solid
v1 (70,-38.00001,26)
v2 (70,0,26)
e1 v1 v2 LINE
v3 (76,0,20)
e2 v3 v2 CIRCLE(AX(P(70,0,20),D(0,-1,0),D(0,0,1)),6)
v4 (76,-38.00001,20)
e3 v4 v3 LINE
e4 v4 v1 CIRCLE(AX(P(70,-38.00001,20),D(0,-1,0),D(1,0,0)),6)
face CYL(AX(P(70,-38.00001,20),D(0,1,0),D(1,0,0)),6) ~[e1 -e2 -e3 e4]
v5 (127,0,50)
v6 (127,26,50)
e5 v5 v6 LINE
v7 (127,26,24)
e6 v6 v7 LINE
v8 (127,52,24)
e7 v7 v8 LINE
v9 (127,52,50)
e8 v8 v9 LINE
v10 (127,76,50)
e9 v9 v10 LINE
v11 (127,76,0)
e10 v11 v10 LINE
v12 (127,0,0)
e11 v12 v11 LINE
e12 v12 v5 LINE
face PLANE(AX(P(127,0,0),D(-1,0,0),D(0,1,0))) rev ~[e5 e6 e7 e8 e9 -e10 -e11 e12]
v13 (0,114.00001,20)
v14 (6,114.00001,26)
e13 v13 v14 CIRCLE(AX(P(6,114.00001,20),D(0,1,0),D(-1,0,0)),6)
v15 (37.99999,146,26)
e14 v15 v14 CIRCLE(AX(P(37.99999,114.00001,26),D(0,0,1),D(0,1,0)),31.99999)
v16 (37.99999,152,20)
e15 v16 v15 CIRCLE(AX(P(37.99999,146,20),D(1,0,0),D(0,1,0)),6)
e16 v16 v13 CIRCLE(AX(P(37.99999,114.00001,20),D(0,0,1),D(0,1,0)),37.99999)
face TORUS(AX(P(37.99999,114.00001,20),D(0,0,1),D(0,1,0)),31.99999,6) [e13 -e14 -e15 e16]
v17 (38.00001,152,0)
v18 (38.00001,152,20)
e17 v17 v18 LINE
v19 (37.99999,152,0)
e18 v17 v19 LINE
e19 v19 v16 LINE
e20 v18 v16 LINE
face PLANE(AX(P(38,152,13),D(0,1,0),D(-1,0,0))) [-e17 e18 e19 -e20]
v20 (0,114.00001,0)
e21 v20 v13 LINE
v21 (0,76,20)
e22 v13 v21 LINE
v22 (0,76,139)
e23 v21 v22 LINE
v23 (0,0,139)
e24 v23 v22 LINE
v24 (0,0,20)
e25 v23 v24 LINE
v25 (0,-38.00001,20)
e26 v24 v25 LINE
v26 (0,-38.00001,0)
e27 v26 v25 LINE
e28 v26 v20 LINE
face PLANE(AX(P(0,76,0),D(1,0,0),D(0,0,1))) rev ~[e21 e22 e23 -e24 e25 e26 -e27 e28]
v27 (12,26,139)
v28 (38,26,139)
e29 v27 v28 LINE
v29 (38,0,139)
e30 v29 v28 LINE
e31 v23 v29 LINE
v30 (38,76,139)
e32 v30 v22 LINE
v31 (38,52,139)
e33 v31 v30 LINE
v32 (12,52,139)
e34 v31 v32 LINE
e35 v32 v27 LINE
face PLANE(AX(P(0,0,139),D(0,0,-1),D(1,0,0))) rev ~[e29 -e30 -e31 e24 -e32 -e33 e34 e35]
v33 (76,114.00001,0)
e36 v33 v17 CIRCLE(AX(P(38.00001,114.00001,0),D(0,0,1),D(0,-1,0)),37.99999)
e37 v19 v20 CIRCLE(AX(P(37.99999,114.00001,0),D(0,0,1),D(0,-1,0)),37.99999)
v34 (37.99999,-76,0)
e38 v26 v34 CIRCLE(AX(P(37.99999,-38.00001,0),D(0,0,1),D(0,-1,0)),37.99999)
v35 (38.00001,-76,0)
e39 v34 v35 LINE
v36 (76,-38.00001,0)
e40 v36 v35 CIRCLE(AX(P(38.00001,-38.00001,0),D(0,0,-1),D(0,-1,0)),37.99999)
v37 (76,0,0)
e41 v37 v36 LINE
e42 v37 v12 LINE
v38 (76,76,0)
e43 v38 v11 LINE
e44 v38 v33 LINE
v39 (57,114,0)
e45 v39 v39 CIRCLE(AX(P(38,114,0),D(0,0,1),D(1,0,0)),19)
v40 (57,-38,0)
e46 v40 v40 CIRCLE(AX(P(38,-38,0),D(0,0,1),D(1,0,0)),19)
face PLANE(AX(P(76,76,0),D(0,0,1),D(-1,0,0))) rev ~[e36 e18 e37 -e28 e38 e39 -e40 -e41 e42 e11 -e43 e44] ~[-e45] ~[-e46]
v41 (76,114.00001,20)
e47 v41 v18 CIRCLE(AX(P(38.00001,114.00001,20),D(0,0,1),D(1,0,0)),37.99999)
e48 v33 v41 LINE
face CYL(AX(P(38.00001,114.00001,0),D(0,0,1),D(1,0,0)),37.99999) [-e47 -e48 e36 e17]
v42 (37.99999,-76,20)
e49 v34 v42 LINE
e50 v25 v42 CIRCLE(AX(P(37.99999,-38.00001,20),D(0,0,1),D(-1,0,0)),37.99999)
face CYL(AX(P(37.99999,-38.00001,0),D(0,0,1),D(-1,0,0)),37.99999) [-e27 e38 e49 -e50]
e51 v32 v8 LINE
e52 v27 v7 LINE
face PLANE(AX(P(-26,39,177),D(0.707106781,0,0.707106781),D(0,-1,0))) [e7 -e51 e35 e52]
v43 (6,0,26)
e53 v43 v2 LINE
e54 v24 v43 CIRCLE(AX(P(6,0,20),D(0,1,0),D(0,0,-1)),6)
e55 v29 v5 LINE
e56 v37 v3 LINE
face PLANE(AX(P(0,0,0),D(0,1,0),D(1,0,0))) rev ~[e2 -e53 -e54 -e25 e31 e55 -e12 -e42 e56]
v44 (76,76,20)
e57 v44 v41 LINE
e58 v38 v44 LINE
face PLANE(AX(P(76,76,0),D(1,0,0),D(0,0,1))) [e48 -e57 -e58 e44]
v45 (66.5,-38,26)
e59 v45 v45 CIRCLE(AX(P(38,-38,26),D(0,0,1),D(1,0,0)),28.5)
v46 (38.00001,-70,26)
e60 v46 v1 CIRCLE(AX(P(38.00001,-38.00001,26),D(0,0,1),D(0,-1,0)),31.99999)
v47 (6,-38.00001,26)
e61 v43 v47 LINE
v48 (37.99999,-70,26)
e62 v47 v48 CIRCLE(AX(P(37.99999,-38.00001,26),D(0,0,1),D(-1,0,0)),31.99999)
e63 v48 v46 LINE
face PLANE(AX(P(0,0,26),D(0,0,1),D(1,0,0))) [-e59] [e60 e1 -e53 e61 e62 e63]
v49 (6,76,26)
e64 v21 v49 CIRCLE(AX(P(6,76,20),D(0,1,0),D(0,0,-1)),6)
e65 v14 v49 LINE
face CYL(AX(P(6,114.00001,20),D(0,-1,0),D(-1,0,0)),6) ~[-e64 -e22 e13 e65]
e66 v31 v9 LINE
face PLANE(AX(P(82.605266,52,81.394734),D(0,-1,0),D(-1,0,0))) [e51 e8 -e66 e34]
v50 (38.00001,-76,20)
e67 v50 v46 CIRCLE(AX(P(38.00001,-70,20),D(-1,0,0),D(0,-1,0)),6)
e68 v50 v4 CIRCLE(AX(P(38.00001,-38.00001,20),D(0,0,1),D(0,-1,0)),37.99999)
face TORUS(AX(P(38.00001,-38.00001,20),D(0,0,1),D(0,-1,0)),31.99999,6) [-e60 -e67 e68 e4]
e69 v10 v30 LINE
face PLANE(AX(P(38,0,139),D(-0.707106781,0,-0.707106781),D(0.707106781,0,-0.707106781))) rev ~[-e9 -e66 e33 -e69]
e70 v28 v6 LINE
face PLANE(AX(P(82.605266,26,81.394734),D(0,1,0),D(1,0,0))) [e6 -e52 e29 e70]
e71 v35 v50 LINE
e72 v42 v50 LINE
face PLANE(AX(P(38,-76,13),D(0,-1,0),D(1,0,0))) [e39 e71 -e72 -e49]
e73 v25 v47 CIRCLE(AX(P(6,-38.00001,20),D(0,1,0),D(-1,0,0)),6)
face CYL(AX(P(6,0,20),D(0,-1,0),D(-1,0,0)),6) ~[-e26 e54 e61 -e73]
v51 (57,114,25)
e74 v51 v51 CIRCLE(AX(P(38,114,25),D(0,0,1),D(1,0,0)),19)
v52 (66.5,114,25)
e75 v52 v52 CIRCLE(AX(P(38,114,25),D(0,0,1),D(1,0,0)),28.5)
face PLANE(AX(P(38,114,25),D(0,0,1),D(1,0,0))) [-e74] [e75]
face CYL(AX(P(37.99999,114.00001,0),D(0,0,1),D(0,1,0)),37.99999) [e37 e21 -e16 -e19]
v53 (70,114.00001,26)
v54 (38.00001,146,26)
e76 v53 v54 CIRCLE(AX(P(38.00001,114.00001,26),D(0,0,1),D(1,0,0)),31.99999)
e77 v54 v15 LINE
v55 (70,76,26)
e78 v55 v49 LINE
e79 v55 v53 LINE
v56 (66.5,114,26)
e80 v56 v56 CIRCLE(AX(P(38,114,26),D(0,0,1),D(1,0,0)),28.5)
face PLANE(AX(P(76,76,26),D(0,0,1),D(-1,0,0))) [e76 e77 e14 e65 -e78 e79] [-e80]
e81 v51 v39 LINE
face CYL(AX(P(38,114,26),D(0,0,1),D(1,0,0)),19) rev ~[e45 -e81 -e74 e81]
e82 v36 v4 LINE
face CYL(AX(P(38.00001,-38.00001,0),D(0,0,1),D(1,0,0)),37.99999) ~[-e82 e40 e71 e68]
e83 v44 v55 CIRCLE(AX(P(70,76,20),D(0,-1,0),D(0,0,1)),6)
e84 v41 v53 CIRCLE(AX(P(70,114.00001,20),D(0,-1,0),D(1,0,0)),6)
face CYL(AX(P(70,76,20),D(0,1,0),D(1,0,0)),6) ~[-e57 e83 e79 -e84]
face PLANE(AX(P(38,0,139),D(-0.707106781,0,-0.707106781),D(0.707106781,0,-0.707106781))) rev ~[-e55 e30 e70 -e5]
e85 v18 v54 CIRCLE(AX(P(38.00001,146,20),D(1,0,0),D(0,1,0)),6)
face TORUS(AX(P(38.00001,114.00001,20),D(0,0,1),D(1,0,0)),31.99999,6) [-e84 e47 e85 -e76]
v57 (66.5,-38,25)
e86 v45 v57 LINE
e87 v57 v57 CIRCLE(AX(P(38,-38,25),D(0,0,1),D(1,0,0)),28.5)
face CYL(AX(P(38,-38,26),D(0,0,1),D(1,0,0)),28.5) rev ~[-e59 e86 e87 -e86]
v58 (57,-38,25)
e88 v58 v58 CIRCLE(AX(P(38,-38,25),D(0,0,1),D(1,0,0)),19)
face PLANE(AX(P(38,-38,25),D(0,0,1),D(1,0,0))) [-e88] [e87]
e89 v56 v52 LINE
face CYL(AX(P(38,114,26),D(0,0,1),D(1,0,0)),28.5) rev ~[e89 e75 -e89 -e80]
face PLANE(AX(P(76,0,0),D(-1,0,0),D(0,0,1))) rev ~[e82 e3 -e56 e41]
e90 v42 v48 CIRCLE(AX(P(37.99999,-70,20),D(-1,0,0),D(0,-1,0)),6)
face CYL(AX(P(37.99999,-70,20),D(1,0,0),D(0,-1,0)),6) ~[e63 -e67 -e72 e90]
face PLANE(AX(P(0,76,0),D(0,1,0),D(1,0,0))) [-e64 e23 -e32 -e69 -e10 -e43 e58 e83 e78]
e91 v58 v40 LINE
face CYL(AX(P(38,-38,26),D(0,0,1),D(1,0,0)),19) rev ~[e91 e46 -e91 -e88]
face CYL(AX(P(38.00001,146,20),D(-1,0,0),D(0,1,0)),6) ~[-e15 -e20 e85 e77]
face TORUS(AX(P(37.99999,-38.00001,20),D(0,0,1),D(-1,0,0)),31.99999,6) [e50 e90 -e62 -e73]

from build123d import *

# Parameters (mm, degrees)
F0_W      = 127
F0_H      = 76
F1_DEPTH  = 200
F3_DEPTH  = 76.001
F4_W      = 26
F4_H      = 26
F6_W      = 76
F6_H      = 26
F7_DEPTH  = 76
F8_R      = 37.99999
F9_W      = 76
F9_H      = 26
F10_DEPTH = 76
F11_R     = 37.99999
F12_R     = 19
F13_DEPTH = 26.001
F12_R_2   = 28.5
F14_DEPTH = 1
F15_R     = 6
F16_R     = 28.5
F16_R_2   = 19
F17_DEPTH = 1
F18_DEPTH = 26


# Not quite as in the source:
# - a fillet or chamfer is up to 0.001 mm smaller than in the source, because OpenCascade refuses the exact size
# - a feature names something its author has since deleted; it is built from what else it names


with BuildPart() as f1:
    # F0 (on Top) → F1 (new body)
    with BuildSketch(Plane.XY):
        with Locations((63.5, 38)):
            Rectangle(F0_W, F0_H)
    extrude(amount=F1_DEPTH)

    # F2 (on face) → F3 (cut, through all)
    with BuildSketch(Plane.XZ):
        Polygon((38, 139), (127, 50), (127, 200), (0, 200), (0, 177), align=None)
        Polygon((0, 139), (38, 139), (0, 177), align=None)
    extrude(amount=-F3_DEPTH, mode=Mode.SUBTRACT)

    # F5: sweep along a path in F2
    with BuildLine(Plane.XZ) as f5_path:
        Line((0, 177), (191.2105315588, -14.2105315588))
    # F4 (on face) → F5 (sweep, cut)
    with BuildSketch(Plane.XY.offset(139)):
        with Locations((25, 39)):
            Rectangle(F4_W, F4_H)
    sweep(path=f5_path.line, mode=Mode.SUBTRACT)

    # F6 (on face) → F7 (join)
    with BuildSketch(Plane.XZ):
        with Locations((38, 13)):
            Rectangle(F6_W, F6_H)
    extrude(amount=F7_DEPTH)

    # F8 (radius 38 in the source; OpenCascade refuses exactly that, so slightly less here)
    f8_edges = [f1.edges().sort_by_distance(p)[0] for p in [
        (76, -76, 13),
        (0, -76, 13),
    ]]
    fillet(f8_edges, radius=F8_R)

    # F9 (on face) → F10 (join)
    with BuildSketch(Plane(origin=(0, 76, 0), x_dir=(-1, 0, 0), z_dir=(0, 1, 0))):
        with Locations((-38, 13)):
            Rectangle(F9_W, F9_H)
    extrude(amount=F10_DEPTH)

    # F11 (radius 38 in the source; OpenCascade refuses exactly that, so slightly less here)
    f11_edges = [f1.edges().sort_by_distance(p)[0] for p in [
        (0, 152, 13),
        (76, 152, 13),
    ]]
    fillet(f11_edges, radius=F11_R)

    # F12 (on face) → F13 (cut, through all)
    with BuildSketch(Plane.XY.offset(26)):
        with Locations((38, 114)):
            Circle(F12_R)
    extrude(amount=-F13_DEPTH, mode=Mode.SUBTRACT)

    # F12 (on face) → F14 (cut)
    with BuildSketch(Plane.XY.offset(26)):
        with Locations((38, 114)):
            Circle(F12_R_2)
        with Locations((38, 114)):
            Circle(F12_R, mode=Mode.SUBTRACT)
    extrude(amount=-F14_DEPTH, mode=Mode.SUBTRACT)

    # F15
    f15_edges = [f1.edges().sort_by_distance(p)[0] for p in [
        (64.870061, 140.870061, 26),
        (11.129939, -64.870061, 26),
    ]]
    fillet(f15_edges, radius=F15_R)

    # F16 (on face) → F17 (cut)
    with BuildSketch(Plane.XY.offset(26)):
        with Locations((38, -38)):
            Circle(F16_R)
        with Locations((38, -38)):
            Circle(F16_R_2, mode=Mode.SUBTRACT)
    extrude(amount=-F17_DEPTH, mode=Mode.SUBTRACT)

    # F18 (cut, through all): a face of the model
    f18_faces = [f1.faces().sort_by_distance(p)[0] for p in [
        (38, -38, 26),
    ]]
    extrude(f18_faces, amount=-F18_DEPTH, mode=Mode.SUBTRACT)


solid = f1.part
